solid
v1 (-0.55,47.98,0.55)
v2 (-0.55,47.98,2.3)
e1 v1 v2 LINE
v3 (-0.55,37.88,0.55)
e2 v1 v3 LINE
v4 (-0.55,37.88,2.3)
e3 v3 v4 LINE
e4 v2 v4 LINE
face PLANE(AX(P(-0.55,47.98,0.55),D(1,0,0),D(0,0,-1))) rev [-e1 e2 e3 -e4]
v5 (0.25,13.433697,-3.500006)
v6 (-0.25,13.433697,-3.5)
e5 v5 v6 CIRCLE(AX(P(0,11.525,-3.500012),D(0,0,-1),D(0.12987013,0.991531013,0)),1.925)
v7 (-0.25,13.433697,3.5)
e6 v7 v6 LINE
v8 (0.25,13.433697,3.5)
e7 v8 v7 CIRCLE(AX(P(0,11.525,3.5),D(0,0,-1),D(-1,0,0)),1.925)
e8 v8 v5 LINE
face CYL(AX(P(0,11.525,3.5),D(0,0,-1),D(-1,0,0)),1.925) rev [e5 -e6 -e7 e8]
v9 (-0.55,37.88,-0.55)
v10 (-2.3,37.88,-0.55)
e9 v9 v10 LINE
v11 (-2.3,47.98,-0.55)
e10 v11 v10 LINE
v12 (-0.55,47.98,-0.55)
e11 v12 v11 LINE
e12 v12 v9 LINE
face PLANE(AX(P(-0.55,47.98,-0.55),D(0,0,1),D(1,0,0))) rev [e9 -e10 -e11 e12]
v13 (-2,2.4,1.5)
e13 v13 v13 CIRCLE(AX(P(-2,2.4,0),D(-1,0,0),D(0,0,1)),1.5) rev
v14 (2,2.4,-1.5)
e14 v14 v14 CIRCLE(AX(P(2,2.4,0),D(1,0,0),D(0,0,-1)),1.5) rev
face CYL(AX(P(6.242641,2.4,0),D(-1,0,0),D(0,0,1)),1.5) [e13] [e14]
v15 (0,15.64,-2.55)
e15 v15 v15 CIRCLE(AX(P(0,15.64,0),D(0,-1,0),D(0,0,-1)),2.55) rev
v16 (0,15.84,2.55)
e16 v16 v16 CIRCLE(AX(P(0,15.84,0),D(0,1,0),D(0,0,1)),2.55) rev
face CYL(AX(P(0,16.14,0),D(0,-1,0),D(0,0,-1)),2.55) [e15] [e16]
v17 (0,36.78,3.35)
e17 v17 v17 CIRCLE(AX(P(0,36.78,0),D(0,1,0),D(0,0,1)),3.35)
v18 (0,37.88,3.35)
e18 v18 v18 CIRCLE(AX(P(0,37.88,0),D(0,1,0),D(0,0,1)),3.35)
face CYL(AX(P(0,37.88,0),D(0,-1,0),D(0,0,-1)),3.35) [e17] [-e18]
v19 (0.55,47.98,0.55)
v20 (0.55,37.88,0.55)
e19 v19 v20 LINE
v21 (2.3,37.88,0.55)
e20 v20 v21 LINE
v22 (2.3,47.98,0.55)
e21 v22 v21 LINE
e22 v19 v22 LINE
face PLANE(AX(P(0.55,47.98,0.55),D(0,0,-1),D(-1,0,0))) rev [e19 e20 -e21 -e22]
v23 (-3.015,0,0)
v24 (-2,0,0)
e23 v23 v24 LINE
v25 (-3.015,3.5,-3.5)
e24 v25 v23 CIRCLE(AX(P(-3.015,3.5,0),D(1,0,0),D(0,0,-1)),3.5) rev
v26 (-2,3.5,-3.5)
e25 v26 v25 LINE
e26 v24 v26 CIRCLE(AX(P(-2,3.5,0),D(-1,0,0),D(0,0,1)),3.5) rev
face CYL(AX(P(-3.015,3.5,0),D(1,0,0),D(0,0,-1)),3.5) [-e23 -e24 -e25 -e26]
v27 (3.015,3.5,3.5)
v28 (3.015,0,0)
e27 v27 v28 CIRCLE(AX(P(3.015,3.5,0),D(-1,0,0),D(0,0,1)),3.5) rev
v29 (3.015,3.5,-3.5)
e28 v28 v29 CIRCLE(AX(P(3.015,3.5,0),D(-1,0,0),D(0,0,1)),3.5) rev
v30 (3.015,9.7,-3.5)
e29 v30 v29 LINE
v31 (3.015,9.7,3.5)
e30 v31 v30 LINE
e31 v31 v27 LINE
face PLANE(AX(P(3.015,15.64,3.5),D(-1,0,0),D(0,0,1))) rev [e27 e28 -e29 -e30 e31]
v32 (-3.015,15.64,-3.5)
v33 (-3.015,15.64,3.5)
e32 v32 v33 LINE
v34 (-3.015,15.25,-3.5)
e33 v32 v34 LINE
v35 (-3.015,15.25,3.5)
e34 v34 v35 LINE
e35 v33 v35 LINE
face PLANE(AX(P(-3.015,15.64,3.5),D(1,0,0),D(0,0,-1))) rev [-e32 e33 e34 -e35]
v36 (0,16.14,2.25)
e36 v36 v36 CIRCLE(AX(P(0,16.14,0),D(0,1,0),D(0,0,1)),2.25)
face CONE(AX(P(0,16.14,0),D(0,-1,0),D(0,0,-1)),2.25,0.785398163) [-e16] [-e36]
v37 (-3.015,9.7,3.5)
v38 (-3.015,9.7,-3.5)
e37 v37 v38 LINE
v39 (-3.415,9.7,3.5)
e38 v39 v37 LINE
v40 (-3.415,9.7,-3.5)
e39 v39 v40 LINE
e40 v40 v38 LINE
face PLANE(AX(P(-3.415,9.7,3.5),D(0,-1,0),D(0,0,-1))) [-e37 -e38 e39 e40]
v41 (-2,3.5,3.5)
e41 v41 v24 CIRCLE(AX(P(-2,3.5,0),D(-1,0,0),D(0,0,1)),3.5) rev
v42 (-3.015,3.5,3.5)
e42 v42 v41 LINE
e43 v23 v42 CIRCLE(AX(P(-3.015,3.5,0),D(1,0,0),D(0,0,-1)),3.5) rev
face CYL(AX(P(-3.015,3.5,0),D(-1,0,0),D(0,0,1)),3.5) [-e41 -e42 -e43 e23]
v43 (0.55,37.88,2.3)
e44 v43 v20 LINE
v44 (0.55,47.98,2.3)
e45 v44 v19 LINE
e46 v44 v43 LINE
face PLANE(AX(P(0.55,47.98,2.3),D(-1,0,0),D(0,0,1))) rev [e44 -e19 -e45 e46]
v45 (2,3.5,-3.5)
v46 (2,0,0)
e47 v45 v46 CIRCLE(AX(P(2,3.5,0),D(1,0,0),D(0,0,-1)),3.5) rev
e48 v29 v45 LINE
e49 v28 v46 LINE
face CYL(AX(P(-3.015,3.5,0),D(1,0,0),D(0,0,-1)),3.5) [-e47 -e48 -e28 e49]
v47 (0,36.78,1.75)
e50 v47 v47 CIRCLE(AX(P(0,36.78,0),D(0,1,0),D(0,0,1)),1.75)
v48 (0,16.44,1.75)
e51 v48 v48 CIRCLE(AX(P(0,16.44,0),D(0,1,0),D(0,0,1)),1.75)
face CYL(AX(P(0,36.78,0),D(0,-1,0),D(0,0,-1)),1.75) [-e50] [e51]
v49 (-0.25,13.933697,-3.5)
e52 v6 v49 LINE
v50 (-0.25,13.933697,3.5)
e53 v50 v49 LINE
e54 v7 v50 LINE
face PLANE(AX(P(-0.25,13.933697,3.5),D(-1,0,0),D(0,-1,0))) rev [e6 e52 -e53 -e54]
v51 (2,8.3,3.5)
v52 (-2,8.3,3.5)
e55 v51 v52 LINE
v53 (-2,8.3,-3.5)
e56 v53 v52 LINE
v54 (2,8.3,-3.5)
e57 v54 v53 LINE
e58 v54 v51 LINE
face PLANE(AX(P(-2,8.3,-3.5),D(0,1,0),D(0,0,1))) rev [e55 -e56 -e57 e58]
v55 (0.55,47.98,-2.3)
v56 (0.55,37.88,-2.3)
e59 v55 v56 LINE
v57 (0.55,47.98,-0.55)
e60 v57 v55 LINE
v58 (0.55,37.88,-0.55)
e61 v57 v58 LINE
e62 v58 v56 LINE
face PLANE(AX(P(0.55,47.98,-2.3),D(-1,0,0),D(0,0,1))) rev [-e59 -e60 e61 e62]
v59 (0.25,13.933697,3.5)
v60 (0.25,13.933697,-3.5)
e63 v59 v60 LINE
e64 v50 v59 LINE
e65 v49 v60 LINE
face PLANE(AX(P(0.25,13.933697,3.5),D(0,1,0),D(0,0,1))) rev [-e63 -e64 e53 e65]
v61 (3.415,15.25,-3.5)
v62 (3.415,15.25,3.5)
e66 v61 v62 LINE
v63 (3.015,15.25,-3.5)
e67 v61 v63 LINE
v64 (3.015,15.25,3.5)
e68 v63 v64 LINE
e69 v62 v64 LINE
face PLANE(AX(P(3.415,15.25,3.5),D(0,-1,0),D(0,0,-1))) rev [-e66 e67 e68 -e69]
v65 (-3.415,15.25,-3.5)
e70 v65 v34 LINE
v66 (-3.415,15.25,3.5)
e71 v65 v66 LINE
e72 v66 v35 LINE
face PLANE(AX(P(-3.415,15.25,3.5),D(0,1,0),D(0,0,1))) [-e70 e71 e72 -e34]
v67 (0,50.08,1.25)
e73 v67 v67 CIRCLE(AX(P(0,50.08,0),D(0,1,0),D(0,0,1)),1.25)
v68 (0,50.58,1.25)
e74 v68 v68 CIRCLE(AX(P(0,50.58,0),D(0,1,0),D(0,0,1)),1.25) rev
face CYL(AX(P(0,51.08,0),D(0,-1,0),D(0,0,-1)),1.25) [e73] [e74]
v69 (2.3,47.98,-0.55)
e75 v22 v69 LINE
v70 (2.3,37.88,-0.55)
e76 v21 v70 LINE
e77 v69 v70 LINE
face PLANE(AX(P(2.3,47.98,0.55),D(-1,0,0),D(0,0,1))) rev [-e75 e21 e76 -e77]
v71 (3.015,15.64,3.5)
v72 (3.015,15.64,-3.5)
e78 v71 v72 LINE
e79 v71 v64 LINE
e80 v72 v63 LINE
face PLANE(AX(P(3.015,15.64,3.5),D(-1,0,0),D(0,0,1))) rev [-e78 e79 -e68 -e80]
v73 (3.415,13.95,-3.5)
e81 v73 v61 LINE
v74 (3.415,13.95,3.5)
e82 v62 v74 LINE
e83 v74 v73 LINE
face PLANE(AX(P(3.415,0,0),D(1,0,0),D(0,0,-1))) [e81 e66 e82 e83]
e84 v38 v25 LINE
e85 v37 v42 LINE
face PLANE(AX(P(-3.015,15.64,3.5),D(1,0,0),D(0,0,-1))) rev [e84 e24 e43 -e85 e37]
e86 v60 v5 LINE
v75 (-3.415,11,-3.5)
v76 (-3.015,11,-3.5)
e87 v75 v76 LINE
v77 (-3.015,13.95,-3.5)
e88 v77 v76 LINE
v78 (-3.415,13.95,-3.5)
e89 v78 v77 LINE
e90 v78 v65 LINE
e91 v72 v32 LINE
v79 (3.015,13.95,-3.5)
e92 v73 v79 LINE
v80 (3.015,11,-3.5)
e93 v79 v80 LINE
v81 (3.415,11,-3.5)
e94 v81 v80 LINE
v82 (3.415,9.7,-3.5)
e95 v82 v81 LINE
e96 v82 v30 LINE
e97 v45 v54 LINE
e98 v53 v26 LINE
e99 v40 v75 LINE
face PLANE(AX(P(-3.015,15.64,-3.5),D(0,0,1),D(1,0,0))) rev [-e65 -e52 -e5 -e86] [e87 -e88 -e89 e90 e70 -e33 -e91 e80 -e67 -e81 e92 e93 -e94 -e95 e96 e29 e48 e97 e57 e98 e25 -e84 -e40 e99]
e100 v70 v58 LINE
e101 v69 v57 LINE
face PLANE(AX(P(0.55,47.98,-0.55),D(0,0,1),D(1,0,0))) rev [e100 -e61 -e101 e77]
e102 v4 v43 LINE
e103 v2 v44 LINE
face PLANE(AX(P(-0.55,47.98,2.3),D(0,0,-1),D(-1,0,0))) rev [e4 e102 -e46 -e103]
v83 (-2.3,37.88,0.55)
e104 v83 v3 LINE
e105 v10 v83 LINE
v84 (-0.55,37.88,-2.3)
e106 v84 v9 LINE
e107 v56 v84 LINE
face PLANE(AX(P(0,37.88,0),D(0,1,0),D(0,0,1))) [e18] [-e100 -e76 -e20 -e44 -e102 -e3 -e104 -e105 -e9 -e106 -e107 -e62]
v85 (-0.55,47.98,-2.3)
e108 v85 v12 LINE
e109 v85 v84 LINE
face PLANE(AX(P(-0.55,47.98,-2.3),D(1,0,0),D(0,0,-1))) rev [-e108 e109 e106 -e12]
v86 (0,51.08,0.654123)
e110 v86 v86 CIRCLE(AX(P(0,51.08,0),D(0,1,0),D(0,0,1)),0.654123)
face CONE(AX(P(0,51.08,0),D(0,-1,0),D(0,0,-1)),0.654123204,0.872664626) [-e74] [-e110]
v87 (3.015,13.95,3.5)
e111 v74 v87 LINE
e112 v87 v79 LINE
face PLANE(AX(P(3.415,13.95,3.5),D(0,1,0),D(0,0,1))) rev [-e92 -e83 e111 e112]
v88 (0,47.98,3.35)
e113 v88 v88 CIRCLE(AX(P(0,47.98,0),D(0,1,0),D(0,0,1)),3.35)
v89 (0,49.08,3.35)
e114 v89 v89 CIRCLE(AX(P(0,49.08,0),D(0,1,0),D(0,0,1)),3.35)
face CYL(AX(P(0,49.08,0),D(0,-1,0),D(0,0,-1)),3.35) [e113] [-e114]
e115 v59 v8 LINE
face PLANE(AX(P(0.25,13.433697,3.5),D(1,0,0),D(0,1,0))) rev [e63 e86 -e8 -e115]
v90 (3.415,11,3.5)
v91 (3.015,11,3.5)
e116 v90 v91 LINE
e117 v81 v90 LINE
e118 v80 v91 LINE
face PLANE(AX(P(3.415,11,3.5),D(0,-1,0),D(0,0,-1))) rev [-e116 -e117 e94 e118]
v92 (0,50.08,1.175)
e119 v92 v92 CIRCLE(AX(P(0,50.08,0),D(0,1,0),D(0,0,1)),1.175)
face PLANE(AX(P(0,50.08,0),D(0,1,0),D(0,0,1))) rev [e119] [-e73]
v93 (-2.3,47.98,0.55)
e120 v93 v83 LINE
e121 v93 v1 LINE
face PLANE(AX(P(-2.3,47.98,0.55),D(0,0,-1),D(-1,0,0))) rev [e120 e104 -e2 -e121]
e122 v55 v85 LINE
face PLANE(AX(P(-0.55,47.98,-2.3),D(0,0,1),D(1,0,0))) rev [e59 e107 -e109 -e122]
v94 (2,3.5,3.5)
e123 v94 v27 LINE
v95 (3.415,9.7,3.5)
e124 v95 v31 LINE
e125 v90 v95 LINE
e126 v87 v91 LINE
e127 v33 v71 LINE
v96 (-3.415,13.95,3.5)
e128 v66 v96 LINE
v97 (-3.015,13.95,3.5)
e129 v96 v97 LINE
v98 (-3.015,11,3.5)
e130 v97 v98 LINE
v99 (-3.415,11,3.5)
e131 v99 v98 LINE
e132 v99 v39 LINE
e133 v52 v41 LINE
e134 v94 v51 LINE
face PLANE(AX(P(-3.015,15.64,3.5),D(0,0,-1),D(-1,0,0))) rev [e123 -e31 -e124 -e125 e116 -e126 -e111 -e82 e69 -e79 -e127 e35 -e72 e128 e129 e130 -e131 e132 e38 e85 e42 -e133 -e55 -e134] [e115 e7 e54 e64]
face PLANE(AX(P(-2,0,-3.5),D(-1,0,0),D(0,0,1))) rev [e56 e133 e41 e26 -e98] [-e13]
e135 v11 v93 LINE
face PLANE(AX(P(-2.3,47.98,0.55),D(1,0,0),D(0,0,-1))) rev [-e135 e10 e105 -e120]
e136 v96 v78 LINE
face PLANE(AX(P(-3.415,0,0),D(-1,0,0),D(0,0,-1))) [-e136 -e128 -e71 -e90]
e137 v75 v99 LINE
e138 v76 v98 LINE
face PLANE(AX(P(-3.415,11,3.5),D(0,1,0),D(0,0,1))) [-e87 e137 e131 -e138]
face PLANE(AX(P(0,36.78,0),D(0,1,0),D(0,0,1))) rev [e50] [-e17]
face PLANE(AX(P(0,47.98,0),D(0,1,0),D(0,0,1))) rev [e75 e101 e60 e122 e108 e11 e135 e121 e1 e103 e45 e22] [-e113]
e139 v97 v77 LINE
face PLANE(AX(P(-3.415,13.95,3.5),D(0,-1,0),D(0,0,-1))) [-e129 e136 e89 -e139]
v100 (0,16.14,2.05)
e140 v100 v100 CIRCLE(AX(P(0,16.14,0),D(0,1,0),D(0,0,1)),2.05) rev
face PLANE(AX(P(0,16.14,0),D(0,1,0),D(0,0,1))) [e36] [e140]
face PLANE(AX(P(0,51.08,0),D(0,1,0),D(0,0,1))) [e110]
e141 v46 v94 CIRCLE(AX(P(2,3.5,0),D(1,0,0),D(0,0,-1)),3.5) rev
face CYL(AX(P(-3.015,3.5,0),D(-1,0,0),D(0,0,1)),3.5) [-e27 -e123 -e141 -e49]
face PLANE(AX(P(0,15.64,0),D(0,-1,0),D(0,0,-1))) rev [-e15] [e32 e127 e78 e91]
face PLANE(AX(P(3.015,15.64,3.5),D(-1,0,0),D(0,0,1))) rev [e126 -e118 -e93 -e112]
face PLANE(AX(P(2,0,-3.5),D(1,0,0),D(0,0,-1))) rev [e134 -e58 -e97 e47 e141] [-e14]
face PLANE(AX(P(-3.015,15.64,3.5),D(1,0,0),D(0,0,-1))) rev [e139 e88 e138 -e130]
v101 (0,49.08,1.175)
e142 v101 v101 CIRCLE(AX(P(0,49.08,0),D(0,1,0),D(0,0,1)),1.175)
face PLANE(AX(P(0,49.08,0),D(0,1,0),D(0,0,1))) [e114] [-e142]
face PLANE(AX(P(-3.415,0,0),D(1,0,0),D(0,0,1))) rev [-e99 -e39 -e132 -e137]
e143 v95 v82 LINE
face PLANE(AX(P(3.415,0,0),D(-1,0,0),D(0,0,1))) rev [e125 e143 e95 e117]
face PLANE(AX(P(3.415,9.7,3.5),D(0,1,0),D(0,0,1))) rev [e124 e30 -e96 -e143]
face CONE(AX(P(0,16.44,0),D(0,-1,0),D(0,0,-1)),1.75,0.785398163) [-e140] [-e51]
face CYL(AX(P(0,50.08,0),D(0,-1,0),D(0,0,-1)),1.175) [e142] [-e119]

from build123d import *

# Parameters (mm, degrees)
SKETCH2_W               = 6.03
SKETCH2_H               = 7
BOSS_EXTRUDE1_DEPTH     = 15.64
CUT_EXTRUDE1_DEPTH      = 17.307968144
CUT_EXTRUDE1_DEPTH_BACK = 17.307968144
SKETCH3_W               = 4
SKETCH3_H               = 8.3
FILLET1_R               = 3.5
SKETCH4_R               = 1.5
BOSS_EXTRUDE2_DEPTH     = 4
CUT_EXTRUDE2_DEPTH      = 18.398270747
CUT_EXTRUDE2_DEPTH_BACK = 18.398270747
SKETCH7_W               = 7
SKETCH7_H               = 1.3
BOSS_EXTRUDE3_DEPTH     = 0.4
SKETCH8_R               = 1.75
BOSS_EXTRUDE4_DEPTH     = 21.14
SKETCH9_R               = 3.35
BOSS_EXTRUDE5_DEPTH     = 1.1
BOSS_EXTRUDE6_DEPTH     = 10.1
SKETCH11_R              = 3.35
BOSS_EXTRUDE7_DEPTH     = 1.1
SKETCH12_R              = 1.175
BOSS_EXTRUDE8_DEPTH     = 1
SKETCH13_R              = 1.25
BOSS_EXTRUDE9_DEPTH     = 1
CHAMFER1_SIZE           = 0.5
CHAMFER1_SIZE2          = 0.595876796
SKETCH14_R              = 2.55
BOSS_EXTRUDE10_DEPTH    = 0.5
CHAMFER3_SIZE           = 0.3


with BuildPart() as part:
    # Sketch2 → Boss-Extrude1 (new body)
    with BuildSketch(Plane(origin=(0, 0, 0), x_dir=(1, 0, 0), z_dir=(0, 1, 0))):
        Rectangle(SKETCH2_W, SKETCH2_H)
    extrude(amount=BOSS_EXTRUDE1_DEPTH)

    # Sketch3 → Cut-Extrude1 (cut, two sides: drawn at the far end of the back side and taken through both)
    with BuildSketch(Plane.XY.offset(-CUT_EXTRUDE1_DEPTH_BACK)):
        with Locations((0, 4.15)):
            Rectangle(SKETCH3_W, SKETCH3_H)
    extrude(amount=CUT_EXTRUDE1_DEPTH + CUT_EXTRUDE1_DEPTH_BACK, mode=Mode.SUBTRACT)

    # Fillet1
    fillet1_edges = [part.edges().sort_by_distance(p)[0] for p in [
        (-2.5075, 0, 3.5),
        (-2.5075, 0, -3.5),
        (2.5075, 0, -3.5),
        (2.5075, 0, 3.5),
    ]]
    fillet(fillet1_edges, radius=FILLET1_R - 0.0001)  # a hair under: the kernel refuses the full size

    # Sketch4 → Boss-Extrude2 (add)
    with BuildSketch(Plane(origin=(-2, 0, 0), x_dir=(0, 0, -1), z_dir=(1, 0, 0))):
        with Locations(Location((0, 2.4, 0), (0, 0, 180))):
            Circle(SKETCH4_R)
    extrude(amount=BOSS_EXTRUDE2_DEPTH)

    # Sketch6 → Cut-Extrude2 (cut, two sides: drawn at the far end of the back side and taken through both)
    with BuildSketch(Plane(origin=(0, 0, -3.5), x_dir=(-1, 0, 0), z_dir=(0, 0, -1)).offset(-CUT_EXTRUDE2_DEPTH_BACK)):
        with BuildLine():
            Line((-0.25, 13.4336972), (-0.25, 13.9336972))
            Line((-0.25, 13.9336972), (0.25, 13.9336972))
            Line((0.25, 13.9336972), (0.25, 13.4336972))
            ThreePointArc((0.25, 13.4336972), (0, 9.6), (-0.25, 13.4336972))
        make_face()
    extrude(amount=CUT_EXTRUDE2_DEPTH + CUT_EXTRUDE2_DEPTH_BACK, mode=Mode.SUBTRACT)

    # Sketch7 → Boss-Extrude3 (add)
    with BuildSketch(Plane(origin=(3.015, 0, 0), x_dir=(0, 0, -1), z_dir=(1, 0, 0))):
        with Locations((0, 14.6)):
            Rectangle(SKETCH7_W, SKETCH7_H)
        with Locations((0, 10.35)):
            Rectangle(SKETCH7_W, SKETCH7_H)
    boss_extrude3 = extrude(amount=BOSS_EXTRUDE3_DEPTH)

    # Mirror1: Boss-Extrude3 across plane
    add(boss_extrude3.mirror(Plane(origin=(0, 0, 0), x_dir=(0, 0, 1), z_dir=(1, 0, 0))))

    # Sketch8 → Boss-Extrude4 (add)
    with BuildSketch(Plane(origin=(0, 15.64, 0), x_dir=(1, 0, 0), z_dir=(0, 1, 0))):
        with Locations(Location((0, 0, 0), (0, 0, 270))):
            Circle(SKETCH8_R)
    extrude(amount=BOSS_EXTRUDE4_DEPTH)

    # Sketch9 → Boss-Extrude5 (add)
    with BuildSketch(Plane(origin=(0, 36.78, 0), x_dir=(1, 0, 0), z_dir=(0, 1, 0))):
        with Locations(Location((0, 0, 0), (0, 0, 270))):
            Circle(SKETCH9_R)
    extrude(amount=BOSS_EXTRUDE5_DEPTH)

    # Sketch10 → Boss-Extrude6 (add)
    with BuildSketch(Plane(origin=(0, 37.88, 0), x_dir=(1, 0, 0), z_dir=(0, 1, 0))):
        Polygon((-0.55, 2.3), (-0.55, 0.55), (-2.3, 0.55), (-2.3, -0.55), (-0.55, -0.55), (-0.55, -2.3), (0.55, -2.3), (0.55, -0.55), (2.3, -0.55), (2.3, 0.55), (0.55, 0.55), (0.55, 2.3), align=None)
    extrude(amount=BOSS_EXTRUDE6_DEPTH)

    # Sketch11 → Boss-Extrude7 (add)
    with BuildSketch(Plane(origin=(0, 47.98, 0), x_dir=(1, 0, 0), z_dir=(0, 1, 0))):
        with Locations(Location((0, 0, 0), (0, 0, 270))):
            Circle(SKETCH11_R)
    extrude(amount=BOSS_EXTRUDE7_DEPTH)

    # Sketch12 → Boss-Extrude8 (add)
    with BuildSketch(Plane(origin=(0, 49.08, 0), x_dir=(1, 0, 0), z_dir=(0, 1, 0))):
        with Locations(Location((0, 0, 0), (0, 0, 270))):
            Circle(SKETCH12_R)
    extrude(amount=BOSS_EXTRUDE8_DEPTH)

    # Sketch13 → Boss-Extrude9 (add)
    with BuildSketch(Plane(origin=(0, 50.08, 0), x_dir=(1, 0, 0), z_dir=(0, 1, 0))):
        with Locations(Location((0, 0, 0), (0, 0, 270))):
            Circle(SKETCH13_R)
    extrude(amount=BOSS_EXTRUDE9_DEPTH)

    # Chamfer1
    chamfer1_edges = [part.edges().sort_by_distance(p)[0] for p in [
        (0, 51.08, -1.25),
    ]]
    chamfer1_side = [part.faces().sort_by_distance(p)[0] for p in [
        (0, 50.58, -1.25),
    ]]
    chamfer(chamfer1_edges, length=CHAMFER1_SIZE, length2=CHAMFER1_SIZE2, reference=chamfer1_side[0])

    # Sketch14 → Boss-Extrude10 (add)
    with BuildSketch(Plane(origin=(0, 15.64, 0), x_dir=(1, 0, 0), z_dir=(0, 1, 0))):
        with Locations(Location((0, 0, 0), (0, 0, 90))):
            Circle(SKETCH14_R)
    extrude(amount=BOSS_EXTRUDE10_DEPTH)

    # Chamfer3
    chamfer3_edges = [part.edges().sort_by_distance(p)[0] for p in [
        (0, 16.14, -1.75),
        (0, 16.14, 2.55),
    ]]
    chamfer(chamfer3_edges, length=CHAMFER3_SIZE)


solid = part.part
